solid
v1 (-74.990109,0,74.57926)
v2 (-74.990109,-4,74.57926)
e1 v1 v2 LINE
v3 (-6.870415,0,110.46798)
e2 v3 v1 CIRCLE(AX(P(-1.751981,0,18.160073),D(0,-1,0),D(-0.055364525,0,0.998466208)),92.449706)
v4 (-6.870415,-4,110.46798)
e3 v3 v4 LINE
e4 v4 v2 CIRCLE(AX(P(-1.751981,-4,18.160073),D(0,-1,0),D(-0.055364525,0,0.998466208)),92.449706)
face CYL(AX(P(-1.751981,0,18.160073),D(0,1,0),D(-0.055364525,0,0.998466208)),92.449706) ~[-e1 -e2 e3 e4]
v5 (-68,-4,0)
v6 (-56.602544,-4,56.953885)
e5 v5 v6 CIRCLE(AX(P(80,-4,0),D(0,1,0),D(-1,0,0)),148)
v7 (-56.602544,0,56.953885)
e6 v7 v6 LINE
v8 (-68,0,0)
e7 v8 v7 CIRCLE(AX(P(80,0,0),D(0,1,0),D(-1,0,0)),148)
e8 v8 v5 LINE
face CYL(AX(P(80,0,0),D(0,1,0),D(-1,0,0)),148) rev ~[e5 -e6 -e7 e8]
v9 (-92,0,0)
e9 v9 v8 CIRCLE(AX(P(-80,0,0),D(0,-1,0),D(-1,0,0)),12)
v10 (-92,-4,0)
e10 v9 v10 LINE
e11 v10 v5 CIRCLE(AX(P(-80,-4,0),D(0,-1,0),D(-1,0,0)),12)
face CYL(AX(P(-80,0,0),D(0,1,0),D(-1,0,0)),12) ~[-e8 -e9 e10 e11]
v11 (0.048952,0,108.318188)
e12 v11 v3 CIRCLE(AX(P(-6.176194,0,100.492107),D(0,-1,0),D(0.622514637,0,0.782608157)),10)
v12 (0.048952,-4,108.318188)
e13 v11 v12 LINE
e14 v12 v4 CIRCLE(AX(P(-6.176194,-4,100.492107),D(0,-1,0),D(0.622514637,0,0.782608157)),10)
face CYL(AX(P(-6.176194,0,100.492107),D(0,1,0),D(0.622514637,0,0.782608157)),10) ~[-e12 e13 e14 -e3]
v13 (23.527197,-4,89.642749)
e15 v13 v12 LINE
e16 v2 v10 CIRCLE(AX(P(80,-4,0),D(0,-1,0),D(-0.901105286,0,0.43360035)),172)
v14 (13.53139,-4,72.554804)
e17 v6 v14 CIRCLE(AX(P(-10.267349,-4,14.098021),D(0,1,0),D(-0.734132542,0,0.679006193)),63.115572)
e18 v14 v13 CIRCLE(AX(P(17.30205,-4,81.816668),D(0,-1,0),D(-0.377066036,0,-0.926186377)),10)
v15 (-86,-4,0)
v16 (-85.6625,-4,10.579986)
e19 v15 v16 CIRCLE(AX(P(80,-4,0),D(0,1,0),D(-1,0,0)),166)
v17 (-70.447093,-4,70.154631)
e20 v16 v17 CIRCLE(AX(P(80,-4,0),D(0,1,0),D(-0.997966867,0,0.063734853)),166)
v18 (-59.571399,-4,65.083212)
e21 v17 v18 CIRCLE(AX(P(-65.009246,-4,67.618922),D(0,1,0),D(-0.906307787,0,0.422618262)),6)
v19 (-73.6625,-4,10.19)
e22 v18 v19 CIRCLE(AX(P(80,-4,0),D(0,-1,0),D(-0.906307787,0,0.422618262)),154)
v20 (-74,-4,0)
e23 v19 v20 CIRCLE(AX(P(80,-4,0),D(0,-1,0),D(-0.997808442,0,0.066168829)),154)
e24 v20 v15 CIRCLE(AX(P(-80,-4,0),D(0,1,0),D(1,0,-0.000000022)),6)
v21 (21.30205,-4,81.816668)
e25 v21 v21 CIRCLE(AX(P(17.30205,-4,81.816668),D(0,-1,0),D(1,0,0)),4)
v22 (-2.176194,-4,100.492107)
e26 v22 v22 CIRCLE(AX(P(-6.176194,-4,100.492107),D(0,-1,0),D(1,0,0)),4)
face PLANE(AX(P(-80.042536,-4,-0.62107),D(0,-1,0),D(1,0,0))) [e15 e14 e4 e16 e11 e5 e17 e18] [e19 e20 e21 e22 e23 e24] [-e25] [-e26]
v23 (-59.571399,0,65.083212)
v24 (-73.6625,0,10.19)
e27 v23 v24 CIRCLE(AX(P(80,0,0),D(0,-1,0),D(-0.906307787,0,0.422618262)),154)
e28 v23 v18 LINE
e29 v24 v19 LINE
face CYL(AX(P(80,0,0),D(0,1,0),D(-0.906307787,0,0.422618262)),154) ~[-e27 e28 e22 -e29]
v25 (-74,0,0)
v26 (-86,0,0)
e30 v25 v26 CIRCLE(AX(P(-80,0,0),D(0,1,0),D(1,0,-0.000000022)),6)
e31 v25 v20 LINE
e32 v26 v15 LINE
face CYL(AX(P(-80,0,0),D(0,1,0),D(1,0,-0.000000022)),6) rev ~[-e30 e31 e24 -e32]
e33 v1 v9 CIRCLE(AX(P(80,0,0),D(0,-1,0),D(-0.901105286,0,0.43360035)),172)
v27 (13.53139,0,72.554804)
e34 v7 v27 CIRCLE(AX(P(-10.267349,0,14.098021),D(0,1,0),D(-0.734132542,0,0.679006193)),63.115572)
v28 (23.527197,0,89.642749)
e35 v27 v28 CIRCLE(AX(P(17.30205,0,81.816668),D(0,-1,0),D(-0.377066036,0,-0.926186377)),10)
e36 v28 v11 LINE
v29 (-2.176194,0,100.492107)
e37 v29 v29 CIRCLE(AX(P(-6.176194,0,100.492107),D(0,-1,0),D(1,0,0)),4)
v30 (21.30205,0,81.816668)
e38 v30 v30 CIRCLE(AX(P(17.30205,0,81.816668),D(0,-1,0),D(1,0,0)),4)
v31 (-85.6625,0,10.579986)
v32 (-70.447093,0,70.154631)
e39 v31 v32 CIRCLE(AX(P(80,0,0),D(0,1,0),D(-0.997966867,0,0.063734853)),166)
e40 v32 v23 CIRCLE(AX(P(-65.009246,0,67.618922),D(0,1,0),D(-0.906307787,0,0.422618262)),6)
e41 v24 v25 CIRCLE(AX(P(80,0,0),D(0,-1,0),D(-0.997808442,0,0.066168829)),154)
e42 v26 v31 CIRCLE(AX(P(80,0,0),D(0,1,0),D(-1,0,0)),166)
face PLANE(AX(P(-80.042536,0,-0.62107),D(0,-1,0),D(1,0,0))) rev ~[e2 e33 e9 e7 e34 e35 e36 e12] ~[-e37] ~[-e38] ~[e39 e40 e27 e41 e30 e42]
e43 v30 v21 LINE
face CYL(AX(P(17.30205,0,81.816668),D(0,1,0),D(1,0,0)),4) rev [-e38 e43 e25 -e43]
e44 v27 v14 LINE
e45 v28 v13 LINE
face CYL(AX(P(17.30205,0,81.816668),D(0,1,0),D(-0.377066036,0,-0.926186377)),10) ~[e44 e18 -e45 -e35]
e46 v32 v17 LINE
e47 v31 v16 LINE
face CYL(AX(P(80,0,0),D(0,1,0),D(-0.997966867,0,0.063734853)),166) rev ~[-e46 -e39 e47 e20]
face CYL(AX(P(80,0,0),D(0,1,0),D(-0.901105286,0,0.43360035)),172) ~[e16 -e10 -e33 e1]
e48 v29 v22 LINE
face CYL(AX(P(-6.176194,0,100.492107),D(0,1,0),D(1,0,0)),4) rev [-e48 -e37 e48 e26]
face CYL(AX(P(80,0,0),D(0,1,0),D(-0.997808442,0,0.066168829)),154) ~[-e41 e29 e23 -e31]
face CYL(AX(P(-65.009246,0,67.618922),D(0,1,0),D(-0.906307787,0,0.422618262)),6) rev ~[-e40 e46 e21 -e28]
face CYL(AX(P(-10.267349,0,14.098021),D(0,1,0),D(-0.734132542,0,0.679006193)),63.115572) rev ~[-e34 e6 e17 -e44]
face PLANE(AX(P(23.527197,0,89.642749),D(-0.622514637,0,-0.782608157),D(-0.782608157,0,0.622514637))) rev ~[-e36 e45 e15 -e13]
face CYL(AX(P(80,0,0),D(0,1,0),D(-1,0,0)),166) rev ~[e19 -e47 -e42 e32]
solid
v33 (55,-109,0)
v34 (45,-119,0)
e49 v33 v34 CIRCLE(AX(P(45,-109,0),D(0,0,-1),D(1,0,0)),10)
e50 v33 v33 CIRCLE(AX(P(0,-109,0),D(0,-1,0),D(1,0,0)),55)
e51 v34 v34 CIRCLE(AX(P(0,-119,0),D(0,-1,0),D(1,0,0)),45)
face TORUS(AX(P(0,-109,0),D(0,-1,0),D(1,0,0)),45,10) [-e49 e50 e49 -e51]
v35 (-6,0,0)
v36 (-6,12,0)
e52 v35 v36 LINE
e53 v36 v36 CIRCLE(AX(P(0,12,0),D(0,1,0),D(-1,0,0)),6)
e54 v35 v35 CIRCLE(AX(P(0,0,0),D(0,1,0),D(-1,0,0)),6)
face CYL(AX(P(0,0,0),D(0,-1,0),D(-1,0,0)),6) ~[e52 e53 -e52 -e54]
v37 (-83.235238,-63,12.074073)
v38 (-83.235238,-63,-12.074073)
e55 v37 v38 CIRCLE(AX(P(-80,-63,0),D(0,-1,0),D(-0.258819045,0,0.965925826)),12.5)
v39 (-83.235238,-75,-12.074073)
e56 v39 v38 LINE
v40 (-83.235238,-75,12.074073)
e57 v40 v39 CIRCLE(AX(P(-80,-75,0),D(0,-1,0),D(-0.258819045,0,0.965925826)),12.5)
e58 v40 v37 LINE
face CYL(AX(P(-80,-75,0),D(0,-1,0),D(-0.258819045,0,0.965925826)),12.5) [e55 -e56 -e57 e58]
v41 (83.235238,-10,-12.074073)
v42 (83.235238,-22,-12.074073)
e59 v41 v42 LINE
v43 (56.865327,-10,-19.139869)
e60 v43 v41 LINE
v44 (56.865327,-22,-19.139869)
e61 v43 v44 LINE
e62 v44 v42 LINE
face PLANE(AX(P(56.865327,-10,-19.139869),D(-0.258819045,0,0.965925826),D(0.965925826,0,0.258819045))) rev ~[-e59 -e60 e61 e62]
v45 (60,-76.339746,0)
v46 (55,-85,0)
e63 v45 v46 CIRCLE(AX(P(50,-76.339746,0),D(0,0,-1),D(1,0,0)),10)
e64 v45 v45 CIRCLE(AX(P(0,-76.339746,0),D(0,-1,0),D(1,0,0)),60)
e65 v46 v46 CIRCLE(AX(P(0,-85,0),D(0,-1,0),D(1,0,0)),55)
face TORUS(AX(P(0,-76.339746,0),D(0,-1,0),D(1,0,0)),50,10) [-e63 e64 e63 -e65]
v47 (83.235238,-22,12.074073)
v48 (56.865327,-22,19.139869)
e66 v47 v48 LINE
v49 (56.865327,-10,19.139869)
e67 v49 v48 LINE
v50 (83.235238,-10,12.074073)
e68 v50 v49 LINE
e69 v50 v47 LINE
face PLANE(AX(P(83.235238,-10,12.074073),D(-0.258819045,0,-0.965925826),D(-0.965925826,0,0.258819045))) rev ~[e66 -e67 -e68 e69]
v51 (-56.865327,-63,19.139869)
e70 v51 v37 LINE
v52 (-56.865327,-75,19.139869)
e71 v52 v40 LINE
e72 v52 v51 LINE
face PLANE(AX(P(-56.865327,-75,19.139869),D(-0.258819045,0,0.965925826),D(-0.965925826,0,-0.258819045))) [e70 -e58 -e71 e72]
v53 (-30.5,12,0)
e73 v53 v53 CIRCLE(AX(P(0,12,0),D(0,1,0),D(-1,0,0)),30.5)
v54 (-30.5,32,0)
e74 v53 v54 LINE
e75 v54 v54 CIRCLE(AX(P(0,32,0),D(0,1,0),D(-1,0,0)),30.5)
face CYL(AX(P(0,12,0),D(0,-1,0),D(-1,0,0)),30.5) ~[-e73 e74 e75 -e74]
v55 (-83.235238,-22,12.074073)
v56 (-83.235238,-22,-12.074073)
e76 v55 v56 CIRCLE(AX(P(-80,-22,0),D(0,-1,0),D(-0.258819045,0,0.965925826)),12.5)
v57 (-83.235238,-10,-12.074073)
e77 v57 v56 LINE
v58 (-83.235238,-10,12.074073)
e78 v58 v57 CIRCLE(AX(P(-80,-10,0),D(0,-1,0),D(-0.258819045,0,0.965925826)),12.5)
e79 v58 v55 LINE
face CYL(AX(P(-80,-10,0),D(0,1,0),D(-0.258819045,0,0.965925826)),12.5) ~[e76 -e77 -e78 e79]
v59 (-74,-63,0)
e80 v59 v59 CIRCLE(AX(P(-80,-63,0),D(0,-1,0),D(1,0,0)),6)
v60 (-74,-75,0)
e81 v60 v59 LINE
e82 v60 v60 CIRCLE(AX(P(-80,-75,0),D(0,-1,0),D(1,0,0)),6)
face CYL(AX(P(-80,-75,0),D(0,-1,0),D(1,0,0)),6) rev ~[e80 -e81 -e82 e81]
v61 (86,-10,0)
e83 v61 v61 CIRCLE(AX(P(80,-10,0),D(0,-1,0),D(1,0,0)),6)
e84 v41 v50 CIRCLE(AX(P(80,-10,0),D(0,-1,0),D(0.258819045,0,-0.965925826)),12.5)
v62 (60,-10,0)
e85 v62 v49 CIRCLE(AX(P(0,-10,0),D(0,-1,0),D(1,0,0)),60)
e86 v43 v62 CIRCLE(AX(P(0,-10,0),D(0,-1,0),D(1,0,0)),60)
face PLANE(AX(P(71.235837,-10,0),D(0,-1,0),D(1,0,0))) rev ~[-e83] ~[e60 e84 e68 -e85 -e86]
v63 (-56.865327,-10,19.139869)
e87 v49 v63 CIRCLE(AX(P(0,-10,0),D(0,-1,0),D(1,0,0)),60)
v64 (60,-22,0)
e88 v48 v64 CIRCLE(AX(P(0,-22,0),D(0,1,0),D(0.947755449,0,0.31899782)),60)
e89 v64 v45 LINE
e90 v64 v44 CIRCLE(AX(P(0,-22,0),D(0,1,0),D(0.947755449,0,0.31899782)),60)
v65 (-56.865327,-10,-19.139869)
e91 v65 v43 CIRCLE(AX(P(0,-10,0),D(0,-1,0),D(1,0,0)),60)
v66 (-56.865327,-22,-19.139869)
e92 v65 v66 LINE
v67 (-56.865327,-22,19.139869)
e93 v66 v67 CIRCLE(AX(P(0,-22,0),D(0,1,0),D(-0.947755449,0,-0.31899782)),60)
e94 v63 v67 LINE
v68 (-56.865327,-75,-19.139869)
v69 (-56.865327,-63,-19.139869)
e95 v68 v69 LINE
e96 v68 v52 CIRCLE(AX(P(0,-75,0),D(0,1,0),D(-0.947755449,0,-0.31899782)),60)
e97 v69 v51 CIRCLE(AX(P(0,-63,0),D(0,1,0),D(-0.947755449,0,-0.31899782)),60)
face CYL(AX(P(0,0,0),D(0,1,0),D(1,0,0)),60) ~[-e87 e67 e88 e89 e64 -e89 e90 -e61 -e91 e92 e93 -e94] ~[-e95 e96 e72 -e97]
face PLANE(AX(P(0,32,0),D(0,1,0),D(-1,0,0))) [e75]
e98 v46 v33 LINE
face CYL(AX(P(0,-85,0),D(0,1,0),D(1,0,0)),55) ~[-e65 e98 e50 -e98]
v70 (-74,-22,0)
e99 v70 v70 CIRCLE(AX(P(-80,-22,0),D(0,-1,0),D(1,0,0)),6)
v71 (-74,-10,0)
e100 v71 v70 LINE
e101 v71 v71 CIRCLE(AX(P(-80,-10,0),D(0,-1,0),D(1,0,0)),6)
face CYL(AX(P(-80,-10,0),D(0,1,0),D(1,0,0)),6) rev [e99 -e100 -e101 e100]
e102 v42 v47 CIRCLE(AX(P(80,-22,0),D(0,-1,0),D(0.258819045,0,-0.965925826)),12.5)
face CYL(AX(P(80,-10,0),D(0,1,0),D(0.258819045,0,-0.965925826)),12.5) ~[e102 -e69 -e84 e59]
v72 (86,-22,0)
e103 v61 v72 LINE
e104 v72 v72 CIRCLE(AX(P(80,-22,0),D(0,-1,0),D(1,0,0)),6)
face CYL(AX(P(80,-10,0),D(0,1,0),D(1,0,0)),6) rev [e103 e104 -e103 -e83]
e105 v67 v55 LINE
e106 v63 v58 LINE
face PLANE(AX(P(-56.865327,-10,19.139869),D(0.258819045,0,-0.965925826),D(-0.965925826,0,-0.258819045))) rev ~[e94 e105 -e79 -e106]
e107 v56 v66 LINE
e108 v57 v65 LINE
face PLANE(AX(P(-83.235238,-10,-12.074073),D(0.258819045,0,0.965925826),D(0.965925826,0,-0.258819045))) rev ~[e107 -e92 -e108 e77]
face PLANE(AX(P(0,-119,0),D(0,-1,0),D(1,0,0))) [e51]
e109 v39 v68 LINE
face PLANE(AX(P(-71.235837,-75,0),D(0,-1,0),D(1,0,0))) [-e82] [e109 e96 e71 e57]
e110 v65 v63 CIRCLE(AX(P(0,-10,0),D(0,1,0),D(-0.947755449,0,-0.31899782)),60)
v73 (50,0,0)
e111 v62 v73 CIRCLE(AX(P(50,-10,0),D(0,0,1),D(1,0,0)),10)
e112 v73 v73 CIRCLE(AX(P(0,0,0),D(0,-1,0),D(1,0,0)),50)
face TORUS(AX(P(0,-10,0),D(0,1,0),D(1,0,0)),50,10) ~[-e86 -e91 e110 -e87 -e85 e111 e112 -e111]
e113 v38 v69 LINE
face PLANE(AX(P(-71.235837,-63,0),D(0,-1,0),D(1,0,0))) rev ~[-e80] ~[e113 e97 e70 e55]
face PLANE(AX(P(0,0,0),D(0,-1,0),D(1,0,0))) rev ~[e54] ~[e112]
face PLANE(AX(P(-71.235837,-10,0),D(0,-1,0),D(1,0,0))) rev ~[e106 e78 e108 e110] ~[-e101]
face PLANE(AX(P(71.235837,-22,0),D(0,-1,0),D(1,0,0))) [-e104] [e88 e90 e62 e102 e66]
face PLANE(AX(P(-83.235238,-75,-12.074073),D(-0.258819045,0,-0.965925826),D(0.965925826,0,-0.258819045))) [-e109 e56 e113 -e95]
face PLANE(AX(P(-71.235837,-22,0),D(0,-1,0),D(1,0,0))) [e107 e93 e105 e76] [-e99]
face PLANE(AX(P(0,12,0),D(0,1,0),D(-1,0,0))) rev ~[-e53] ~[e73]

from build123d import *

# Parameters (mm, degrees)
F0_R      = 60
F1_DEPTH  = 85
F2_R      = 55
F3_DEPTH  = 34
F5_R      = 6
F6_DEPTH  = 12
F7_R      = 30.5
F8_DEPTH  = 20
F10_R     = 6
F11_DEPTH = 12
F13_R     = 6
F14_DEPTH = 12
F15_R     = 4
F16_DEPTH = 4


# Not quite as in the source:
# - a fillet or chamfer that OpenCascade refuses, or shapes differently, is made with other operations: its cross-section is extruded or revolved along the edge and cut away or added


with BuildPart() as f1:
    # F0 (on Front) → F1 (new body)
    with BuildSketch(Plane.XZ):
        Circle(F0_R)
    extrude(amount=F1_DEPTH)

    # F2 (on face) → F3 (join)
    with BuildSketch(Plane.XZ.offset(85)):
        Circle(F2_R)
    extrude(amount=F3_DEPTH)

    # F4: fillet of radius 10 on 3 edges, made by hand

    # F4_s1 → F4_t2 (revolve, cut)
    with BuildSketch(Plane.XY):
        with BuildLine():
            ThreePointArc((60, -10), (57.0710678119, -2.9289321881), (50, 0))
            Line((50, 0), (60, 0))
            Line((60, 0), (60, -10))
        make_face()
    revolve(axis=Axis((0, 0, 0), (0, -1, 0)), mode=Mode.SUBTRACT)

    # F4_s3 → F4_t4 (revolve, cut)
    with BuildSketch(Plane.XY):
        with BuildLine():
            ThreePointArc((60, -76.3397459622), (58.6602540378, -81.3397459622), (55, -85))
            Line((55, -85), (60, -85))
            Line((60, -85), (60, -76.3397459622))
        make_face()
    revolve(axis=Axis((0, -85, 0), (0, -1, 0)), mode=Mode.SUBTRACT)

    # F4_s5 → F4_t6 (revolve, cut)
    with BuildSketch(Plane.XY):
        with BuildLine():
            ThreePointArc((55, -109), (52.0710678119, -116.0710678119), (45, -119))
            Line((45, -119), (55, -119))
            Line((55, -119), (55, -109))
        make_face()
    revolve(axis=Axis((0, -119, 0), (0, -1, 0)), mode=Mode.SUBTRACT)

    # F5 (on face) → F6 (join)
    with BuildSketch(Plane(origin=(0, 0, 0), x_dir=(-1, 0, 0), z_dir=(0, 1, 0))):
        Circle(F5_R)
    extrude(amount=F6_DEPTH)

    # F7 (on face) → F8 (join)
    with BuildSketch(Plane(origin=(0, 12, 0), x_dir=(-1, 0, 0), z_dir=(0, 1, 0))):
        Circle(F7_R)
    extrude(amount=F8_DEPTH)

    # F10 (on offset) → F11 (join)
    with BuildSketch(Plane.XZ.offset(10)):
        with BuildLine():
            Line((56.8653269235, -19.1398692231), (83.2352380638, -12.0740728286))
            ThreePointArc((83.2352380638, -12.0740728286), (92.5, 0), (83.2352380638, 12.0740728286))
            Line((83.2352380638, 12.0740728286), (56.8653269235, 19.1398692231))
            ThreePointArc((56.8653269235, 19.1398692231), (60, 0), (56.8653269235, -19.1398692231))
        make_face()
        with Locations((80, 0)):
            Circle(F10_R, mode=Mode.SUBTRACT)
        with BuildLine():
            Line((-56.8653269235, 19.1398692231), (-83.2352380638, 12.0740728286))
            ThreePointArc((-83.2352380638, 12.0740728286), (-92.5, 0), (-83.2352380638, -12.0740728286))
            Line((-83.2352380638, -12.0740728286), (-56.8653269235, -19.1398692231))
            ThreePointArc((-56.8653269235, -19.1398692231), (-60, 0), (-56.8653269235, 19.1398692231))
        make_face()
        with Locations((-80, 0)):
            Circle(F10_R, mode=Mode.SUBTRACT)
    extrude(amount=F11_DEPTH)

    # F13 (on offset) → F14 (join)
    with BuildSketch(Plane.XZ.offset(75)):
        with BuildLine():
            Line((-83.2352380638, -12.0740728286), (-56.8653269235, -19.1398692231))
            ThreePointArc((-56.8653269235, -19.1398692231), (-60, 0), (-56.8653269235, 19.1398692231))
            Line((-56.8653269235, 19.1398692231), (-83.2352380638, 12.0740728286))
            ThreePointArc((-83.2352380638, 12.0740728286), (-92.5, 0), (-83.2352380638, -12.0740728286))
        make_face()
        with Locations((-80, 0)):
            Circle(F13_R, mode=Mode.SUBTRACT)
    extrude(amount=-F14_DEPTH)


with BuildPart() as f16:
    # F15 (on Front) → F16 (new body)
    with BuildSketch(Plane.XZ):
        with BuildLine():
            ThreePointArc((-74, -1.341e-07), (-80.000000067, -6), (-86, 0))
            ThreePointArc((-86, 0), (-85.9156035459, 5.2926836293), (-85.6625, 10.5799855269))
            ThreePointArc((-85.6625, 10.5799855269), (-90.2944159621, 6.1664414373), (-92, 0))
            ThreePointArc((-92, 0), (-80, -12), (-68, 0))
            ThreePointArc((-68, 0), (-69.5107197578, 5.8288077683), (-73.6625, 10.1899996933))
            ThreePointArc((-73.6625, 10.1899996933), (-73.9156018755, 5.0977935734), (-74, -1.341e-07))
        make_face()
        with BuildLine():
            ThreePointArc((-92, 0), (-90.2944159621, 6.1664414373), (-85.6625, 10.5799855269))
            ThreePointArc((-85.6625, 10.5799855269), (-80.8371948593, 41.077935072), (-70.4470926481, 70.154631449))
            ThreePointArc((-70.4470926481, 70.154631449), (-62.4735363554, 73.0567686007), (-59.5713992036, 65.0832123081))
            ThreePointArc((-59.5713992036, 65.0832123081), (-69.1638230548, 38.2903890247), (-73.6625, 10.1899996933))
            ThreePointArc((-73.6625, 10.1899996933), (-69.5107197578, 5.8288077683), (-68, 0))
            ThreePointArc((-68, 0), (-65.1226661747, 29.0415523406), (-56.602543752, 56.9538852096))
            ThreePointArc((-56.602543752, 56.9538852096), (-23.9720972385, 75.7077221411), (13.5313898709, 72.5548038174))
            ThreePointArc((13.5313898709, 72.5548038174), (25.933712547, 76.7674690687), (23.5271965971, 89.6427491536))
            Line((23.5271965971, 89.6427491536), (0.0489518915, 108.3181882527))
            ThreePointArc((0.0489518915, 108.3181882527), (-3.2091779587, 110.0418089305), (-6.8704149318, 110.4679804784))
            ThreePointArc((-6.8704149318, 110.4679804784), (-44.8441817754, 99.9525565554), (-74.9901091983, 74.5792601914))
            ThreePointArc((-74.9901091983, 74.5792601914), (-87.6936176217, 38.247230082), (-92, 0))
        make_face()
        with Locations((-6.1761944749, 100.4921066842)):
            Circle(F15_R, mode=Mode.SUBTRACT)
        with Locations((17.3020502307, 81.8166675851)):
            Circle(F15_R, mode=Mode.SUBTRACT)
    extrude(amount=F16_DEPTH)


solid = Compound([f1.part, f16.part])
